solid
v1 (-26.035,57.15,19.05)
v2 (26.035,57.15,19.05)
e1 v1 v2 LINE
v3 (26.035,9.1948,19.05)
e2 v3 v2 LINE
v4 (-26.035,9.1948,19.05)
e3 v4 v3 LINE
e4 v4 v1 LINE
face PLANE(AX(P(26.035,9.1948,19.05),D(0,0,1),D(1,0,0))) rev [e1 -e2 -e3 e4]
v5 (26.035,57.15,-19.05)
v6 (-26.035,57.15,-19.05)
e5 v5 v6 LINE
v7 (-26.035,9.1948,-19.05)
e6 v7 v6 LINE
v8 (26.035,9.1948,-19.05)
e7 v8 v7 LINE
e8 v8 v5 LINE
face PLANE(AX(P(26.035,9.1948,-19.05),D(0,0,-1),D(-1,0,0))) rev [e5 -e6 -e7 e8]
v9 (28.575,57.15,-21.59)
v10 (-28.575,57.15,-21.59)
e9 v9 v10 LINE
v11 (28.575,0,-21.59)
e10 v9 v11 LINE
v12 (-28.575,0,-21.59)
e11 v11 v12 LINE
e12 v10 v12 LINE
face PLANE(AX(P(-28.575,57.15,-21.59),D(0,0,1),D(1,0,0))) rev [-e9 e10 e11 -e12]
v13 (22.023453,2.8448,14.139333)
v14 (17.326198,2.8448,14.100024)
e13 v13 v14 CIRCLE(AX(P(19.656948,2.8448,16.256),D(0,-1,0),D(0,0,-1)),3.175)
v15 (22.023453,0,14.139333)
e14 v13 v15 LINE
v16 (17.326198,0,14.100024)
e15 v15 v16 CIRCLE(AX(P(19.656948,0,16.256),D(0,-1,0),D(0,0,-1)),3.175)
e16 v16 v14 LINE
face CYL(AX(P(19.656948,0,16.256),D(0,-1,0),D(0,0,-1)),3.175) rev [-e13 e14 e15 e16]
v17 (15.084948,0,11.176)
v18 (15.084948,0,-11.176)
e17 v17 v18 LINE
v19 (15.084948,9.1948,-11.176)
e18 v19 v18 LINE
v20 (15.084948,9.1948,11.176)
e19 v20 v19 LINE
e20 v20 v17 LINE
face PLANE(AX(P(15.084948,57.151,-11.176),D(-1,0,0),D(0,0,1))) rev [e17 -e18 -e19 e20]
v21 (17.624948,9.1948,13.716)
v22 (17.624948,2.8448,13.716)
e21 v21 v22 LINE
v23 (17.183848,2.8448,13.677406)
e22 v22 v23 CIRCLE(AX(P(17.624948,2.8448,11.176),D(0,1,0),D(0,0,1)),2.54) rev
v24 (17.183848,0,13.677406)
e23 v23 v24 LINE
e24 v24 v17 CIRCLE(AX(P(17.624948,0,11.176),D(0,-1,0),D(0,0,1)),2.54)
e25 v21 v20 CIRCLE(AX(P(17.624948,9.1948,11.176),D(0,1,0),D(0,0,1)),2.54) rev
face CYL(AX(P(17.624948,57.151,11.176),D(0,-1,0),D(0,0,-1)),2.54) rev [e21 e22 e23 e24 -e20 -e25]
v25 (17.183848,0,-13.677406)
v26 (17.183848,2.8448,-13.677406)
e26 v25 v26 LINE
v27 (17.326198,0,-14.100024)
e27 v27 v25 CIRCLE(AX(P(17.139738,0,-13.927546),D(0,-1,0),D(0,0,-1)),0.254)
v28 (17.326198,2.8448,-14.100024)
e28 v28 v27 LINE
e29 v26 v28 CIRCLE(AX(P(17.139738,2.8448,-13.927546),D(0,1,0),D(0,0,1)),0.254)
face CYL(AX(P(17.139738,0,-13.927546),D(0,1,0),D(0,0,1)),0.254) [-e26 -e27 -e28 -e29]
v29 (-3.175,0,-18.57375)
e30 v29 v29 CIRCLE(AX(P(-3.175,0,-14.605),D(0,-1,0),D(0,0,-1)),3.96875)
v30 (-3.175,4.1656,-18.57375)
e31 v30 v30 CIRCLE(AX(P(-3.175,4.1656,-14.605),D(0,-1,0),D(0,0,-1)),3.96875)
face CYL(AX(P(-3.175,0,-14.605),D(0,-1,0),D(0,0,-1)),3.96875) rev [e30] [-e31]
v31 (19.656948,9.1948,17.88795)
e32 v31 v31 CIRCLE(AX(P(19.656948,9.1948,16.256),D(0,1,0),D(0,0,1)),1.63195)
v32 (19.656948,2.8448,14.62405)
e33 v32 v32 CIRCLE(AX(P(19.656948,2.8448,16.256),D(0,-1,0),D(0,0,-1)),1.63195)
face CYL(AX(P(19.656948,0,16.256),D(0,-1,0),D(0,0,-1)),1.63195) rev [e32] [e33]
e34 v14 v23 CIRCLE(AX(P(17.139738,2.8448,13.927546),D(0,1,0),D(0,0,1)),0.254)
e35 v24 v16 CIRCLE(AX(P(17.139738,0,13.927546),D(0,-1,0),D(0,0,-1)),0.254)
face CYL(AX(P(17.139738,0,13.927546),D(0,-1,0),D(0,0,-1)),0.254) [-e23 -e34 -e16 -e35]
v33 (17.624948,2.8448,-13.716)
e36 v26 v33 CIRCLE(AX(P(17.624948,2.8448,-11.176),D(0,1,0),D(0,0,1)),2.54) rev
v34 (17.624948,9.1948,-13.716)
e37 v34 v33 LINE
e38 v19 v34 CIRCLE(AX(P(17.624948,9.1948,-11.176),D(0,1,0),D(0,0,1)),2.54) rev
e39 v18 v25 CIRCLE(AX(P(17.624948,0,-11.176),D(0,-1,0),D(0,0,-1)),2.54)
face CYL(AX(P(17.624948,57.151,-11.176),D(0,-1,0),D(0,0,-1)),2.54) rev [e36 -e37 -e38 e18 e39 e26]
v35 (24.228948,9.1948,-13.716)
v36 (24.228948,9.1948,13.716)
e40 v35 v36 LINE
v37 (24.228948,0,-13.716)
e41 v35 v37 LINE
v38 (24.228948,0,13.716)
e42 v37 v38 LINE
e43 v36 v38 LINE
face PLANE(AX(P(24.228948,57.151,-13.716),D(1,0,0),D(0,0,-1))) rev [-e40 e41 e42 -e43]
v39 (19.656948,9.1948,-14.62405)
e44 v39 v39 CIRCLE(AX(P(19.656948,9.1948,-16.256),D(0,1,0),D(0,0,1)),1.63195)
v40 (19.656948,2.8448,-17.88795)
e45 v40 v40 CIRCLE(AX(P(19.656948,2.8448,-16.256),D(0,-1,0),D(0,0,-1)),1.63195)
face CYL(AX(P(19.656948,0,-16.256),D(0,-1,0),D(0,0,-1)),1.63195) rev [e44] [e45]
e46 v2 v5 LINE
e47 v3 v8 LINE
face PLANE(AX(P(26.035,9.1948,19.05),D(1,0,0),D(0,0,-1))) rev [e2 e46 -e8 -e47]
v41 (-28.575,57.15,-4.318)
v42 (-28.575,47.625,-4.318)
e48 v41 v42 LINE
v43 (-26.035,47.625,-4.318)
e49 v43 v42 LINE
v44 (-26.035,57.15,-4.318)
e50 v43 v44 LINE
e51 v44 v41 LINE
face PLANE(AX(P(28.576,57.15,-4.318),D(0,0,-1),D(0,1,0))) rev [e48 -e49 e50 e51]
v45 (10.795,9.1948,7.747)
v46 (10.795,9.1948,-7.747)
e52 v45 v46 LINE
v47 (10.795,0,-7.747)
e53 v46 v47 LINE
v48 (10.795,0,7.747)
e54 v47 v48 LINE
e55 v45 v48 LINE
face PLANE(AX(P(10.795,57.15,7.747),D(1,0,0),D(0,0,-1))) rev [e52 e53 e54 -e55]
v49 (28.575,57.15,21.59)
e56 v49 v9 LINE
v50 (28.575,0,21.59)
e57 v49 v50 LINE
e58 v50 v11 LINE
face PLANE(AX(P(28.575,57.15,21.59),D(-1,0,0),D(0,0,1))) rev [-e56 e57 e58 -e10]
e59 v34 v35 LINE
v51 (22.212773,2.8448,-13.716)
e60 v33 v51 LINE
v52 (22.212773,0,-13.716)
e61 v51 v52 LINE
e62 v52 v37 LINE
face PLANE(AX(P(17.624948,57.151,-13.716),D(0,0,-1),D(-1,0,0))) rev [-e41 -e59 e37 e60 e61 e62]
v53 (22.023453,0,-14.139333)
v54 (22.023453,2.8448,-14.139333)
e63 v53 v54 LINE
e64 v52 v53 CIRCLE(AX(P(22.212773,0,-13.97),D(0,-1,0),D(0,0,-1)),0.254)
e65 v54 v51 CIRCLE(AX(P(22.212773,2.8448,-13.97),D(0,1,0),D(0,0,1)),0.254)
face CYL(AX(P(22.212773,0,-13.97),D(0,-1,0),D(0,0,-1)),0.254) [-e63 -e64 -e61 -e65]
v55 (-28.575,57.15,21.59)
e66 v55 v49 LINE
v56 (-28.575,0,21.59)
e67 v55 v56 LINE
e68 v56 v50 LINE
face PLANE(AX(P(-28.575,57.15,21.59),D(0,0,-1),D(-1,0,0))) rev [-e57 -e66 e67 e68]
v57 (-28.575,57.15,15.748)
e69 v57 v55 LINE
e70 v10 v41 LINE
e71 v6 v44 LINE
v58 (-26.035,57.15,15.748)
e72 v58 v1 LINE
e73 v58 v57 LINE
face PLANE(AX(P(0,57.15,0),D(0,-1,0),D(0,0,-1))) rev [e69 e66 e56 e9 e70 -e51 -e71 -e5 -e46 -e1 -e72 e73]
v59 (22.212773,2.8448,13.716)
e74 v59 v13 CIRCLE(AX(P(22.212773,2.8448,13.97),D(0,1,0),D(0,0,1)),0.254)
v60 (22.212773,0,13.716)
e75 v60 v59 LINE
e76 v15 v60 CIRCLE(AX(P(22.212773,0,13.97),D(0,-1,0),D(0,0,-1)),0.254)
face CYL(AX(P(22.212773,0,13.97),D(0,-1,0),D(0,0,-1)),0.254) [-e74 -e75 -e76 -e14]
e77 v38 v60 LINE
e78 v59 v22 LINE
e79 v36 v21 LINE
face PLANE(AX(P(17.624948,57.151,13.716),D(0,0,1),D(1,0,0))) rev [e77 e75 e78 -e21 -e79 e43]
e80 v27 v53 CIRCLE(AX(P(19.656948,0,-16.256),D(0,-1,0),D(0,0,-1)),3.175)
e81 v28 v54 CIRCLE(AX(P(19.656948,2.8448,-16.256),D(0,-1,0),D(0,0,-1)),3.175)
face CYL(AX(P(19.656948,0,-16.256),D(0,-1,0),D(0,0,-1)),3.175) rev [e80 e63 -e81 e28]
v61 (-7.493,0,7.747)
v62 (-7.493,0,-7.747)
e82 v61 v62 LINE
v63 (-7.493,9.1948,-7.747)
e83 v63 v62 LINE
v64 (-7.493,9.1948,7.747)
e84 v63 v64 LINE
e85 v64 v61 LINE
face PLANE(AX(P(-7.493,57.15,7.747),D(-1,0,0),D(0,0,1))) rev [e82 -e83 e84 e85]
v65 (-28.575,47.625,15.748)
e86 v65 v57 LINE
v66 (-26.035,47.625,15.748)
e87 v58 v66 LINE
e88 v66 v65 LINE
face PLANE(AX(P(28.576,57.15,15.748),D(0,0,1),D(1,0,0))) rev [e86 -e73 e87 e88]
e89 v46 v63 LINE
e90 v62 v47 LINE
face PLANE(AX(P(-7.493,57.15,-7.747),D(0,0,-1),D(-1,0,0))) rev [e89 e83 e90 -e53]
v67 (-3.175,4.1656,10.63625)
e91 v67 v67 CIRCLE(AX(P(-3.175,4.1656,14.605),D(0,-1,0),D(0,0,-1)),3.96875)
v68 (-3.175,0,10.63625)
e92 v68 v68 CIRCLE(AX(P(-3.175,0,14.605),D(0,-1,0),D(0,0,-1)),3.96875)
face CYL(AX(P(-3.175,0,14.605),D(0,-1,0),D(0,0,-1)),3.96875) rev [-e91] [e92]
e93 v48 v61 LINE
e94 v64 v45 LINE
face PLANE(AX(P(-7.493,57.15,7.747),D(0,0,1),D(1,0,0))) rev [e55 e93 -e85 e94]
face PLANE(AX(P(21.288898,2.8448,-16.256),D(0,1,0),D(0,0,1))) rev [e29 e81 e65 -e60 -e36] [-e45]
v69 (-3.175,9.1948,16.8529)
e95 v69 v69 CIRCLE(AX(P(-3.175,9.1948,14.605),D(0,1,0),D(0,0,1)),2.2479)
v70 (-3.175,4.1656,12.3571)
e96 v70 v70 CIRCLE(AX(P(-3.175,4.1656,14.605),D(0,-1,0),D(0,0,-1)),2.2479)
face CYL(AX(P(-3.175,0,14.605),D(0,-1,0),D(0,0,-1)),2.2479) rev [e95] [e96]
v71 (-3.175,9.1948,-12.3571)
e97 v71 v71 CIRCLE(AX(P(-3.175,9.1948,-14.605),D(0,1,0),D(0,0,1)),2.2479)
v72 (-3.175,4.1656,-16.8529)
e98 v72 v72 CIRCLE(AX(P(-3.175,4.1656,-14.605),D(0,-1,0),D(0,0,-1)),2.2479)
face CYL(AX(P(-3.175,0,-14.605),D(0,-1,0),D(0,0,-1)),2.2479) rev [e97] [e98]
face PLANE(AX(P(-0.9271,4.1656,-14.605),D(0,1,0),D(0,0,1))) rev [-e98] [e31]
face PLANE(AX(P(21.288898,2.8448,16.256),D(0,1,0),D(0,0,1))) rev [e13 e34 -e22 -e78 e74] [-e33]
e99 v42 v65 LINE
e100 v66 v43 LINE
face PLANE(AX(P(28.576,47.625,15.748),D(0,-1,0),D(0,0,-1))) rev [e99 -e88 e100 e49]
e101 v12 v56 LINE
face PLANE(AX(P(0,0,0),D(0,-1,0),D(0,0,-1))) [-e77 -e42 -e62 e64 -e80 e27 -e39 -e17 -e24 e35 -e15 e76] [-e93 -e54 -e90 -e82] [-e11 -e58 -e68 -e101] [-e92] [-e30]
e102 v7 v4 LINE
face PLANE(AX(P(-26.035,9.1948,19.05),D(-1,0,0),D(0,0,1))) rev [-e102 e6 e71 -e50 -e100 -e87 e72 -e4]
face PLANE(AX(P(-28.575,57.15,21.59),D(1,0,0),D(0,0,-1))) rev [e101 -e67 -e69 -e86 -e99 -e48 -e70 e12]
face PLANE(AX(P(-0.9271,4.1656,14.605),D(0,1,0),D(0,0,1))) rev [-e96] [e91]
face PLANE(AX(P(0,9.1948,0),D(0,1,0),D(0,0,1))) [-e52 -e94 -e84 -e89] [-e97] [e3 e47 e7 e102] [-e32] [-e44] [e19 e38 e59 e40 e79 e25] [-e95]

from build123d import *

# Parameters (mm, degrees)
SKETCH1_W                                      = 57.14999999999999
SKETCH1_H                                      = 43.17999999999999
BASE_DEPTH                                     = 57.15
POCKET_DEPTH                                   = 47.9552
LINACTHOLE_DEPTH                               = 68.44465304974146
ROLLMOTORHOLE_REACH                            = 85.656
DVIHOLE_REACH                                  = 69.445
CBORE_FOR_4_SOCKET_HEAD_CAP_SCREW1_D           = 3.2639
CBORE_FOR_4_SOCKET_HEAD_CAP_SCREW1_CBORE_D     = 6.35
CBORE_FOR_4_SOCKET_HEAD_CAP_SCREW1_CBORE_DEPTH = 2.8448
CBORE_FOR_8_SOCKET_HEAD_CAP_SCREW1_D           = 4.4958
CBORE_FOR_8_SOCKET_HEAD_CAP_SCREW1_CBORE_D     = 7.9375
CBORE_FOR_8_SOCKET_HEAD_CAP_SCREW1_CBORE_DEPTH = 4.1656
FILLET1_R                                      = 0.254


with BuildPart() as part:
    # Sketch1 → Base (new body)
    with BuildSketch(Plane(origin=(0, 0, 0), x_dir=(1, 0, 0), z_dir=(0, 1, 0))):
        Rectangle(SKETCH1_W, SKETCH1_H)
    extrude(amount=BASE_DEPTH)

    # Sketch2 → Pocket (cut)
    with BuildSketch(Plane(origin=(0, 57.15, 0), x_dir=(1, 0, 0), z_dir=(0, 1, 0))):
        Polygon((26.035000000000004, -19.05), (-26.03499999999999, -19.050000000000008), (-26.03499999999999, 19.049999999999994), (26.035000000000004, 19.050000000000004), align=None)
    extrude(amount=-POCKET_DEPTH, mode=Mode.SUBTRACT)

    # Sketch3 → LinActHole (cut, through all)
    with BuildSketch(Plane(origin=(0, 0, 0), x_dir=(-1, 0, 0), z_dir=(0, -1, 0))):
        Polygon((7.492999999999988, -7.7470000000000026), (-10.79500000000001, -7.747000000000003), (-10.79500000000001, 7.746999999999995), (7.492999999999988, 7.746999999999996), align=None)
    extrude(amount=-LINACTHOLE_DEPTH, mode=Mode.SUBTRACT)

    # Sketch4 → RollMotorHole (cut, up to next)
    with BuildSketch(Plane.ZY.offset(28.575), mode=Mode.PRIVATE) as rollmotorhole_sk1:
        Polygon((15.747999999999998, 57.15), (-4.317999999999999, 57.150000000000006), (-4.317999999999998, 47.625), (15.747999999999998, 47.625000000000014), align=None)
    rollmotorhole_tool1 = extrude(rollmotorhole_sk1.sketch, amount=-ROLLMOTORHOLE_REACH, mode=Mode.PRIVATE) & part.part
    add(rollmotorhole_tool1.solids().sort_by_distance((-28.575, 52.3875, 5.715))[0], mode=Mode.SUBTRACT)

    # Sketch5 → DviHole (cut, up to next)
    with BuildSketch(Plane.XZ, mode=Mode.PRIVATE) as dvihole_sk1:
        with BuildLine():
            Line((17.624947542752004, -13.715999999999998), (24.228947542752003, -13.716))
            Line((24.228947542752003, -13.716), (24.228947542752003, 13.716000000000003))
            Line((24.228947542752003, 13.716000000000003), (17.624947542752004, 13.716000000000005))
            ThreePointArc((17.624947542752004, 13.716000000000005), (15.828896318538174, 12.972051224213832), (15.084947542752005, 11.176000000000002))
            Line((15.084947542752005, 11.176000000000002), (15.084947542752005, -11.175999999999998))
            ThreePointArc((15.084947542752005, -11.175999999999998), (15.828896318538174, -12.972051224213828), (17.624947542752004, -13.715999999999998))
        make_face()
    dvihole_tool1 = extrude(dvihole_sk1.sketch, amount=-DVIHOLE_REACH, mode=Mode.PRIVATE) & part.part
    add(dvihole_tool1.solids().sort_by_distance((19.701649, 0, 0))[0], mode=Mode.SUBTRACT)

    # CBORE for #4 Socket Head Cap Screw1 (through all)
    with Locations(Plane(origin=(0, 0, 0), x_dir=(-1, 0, 0), z_dir=(0, -1, 0))):
        with Locations((-19.656947543, 16.256), (-19.656947543, -16.256)):
            CounterBoreHole(CBORE_FOR_4_SOCKET_HEAD_CAP_SCREW1_D / 2, CBORE_FOR_4_SOCKET_HEAD_CAP_SCREW1_CBORE_D / 2, CBORE_FOR_4_SOCKET_HEAD_CAP_SCREW1_CBORE_DEPTH)

    # CBORE for #8 Socket Head Cap Screw1 (through all)
    with Locations(Plane(origin=(0, 0, 0), x_dir=(-1, 0, 0), z_dir=(0, -1, 0))):
        with Locations((3.175, 14.605), (3.175, -14.605)):
            CounterBoreHole(CBORE_FOR_8_SOCKET_HEAD_CAP_SCREW1_D / 2, CBORE_FOR_8_SOCKET_HEAD_CAP_SCREW1_CBORE_D / 2, CBORE_FOR_8_SOCKET_HEAD_CAP_SCREW1_CBORE_DEPTH)

    # Fillet1
    # the kernel refuses this fillet: 0.254 mm, written as the material it takes off along each edge
    with BuildSketch(Plane(origin=(21.56194754300001, 2.8448, 13.716000000000006), x_dir=(1, 0, -5.46e-15), z_dir=(0, -1, 0))) as fillet1_piece_1:
        with BuildLine():
            CenterArc((0.6508256982823206, 0.25399999999999956), FILLET1_R, 138.18968510422349, 131.8103148957768)
            ThreePointArc((0.4615052761873327, 0.4233333333333256), (0.24121576475939824, 0.20026008045803986), (0, 0))
            Line((0, 0), (0.650825698282322, 0))
        make_face()
    extrude(amount=4.471864245705805, mode=Mode.SUBTRACT)
    with BuildSketch(Plane(origin=(17.751947542999993, 2.8448, 13.716000000000006), x_dir=(-0.9977003347705025, 0, -0.06777936263220105), z_dir=(0, -1, 0))) as fillet1_piece_2:
        with BuildLine():
            CenterArc((0.5964633639844708, -0.2525550871245977), FILLET1_R, 96.11431340709308, 122.7684855876463)
            Line((0.3987417282209075, -0.4119983521155698), (0.37896956464454973, -0.4279426786146676))
            ThreePointArc((0.37896956464454973, -0.4279426786146676), (0.19043822259418336, -0.21464439732501625), (-0.01658222975058737, -0.01924031331602186))
            Line((-0.01658222975058737, -0.01924031331602186), (0.00172159581085787, 0.02534158850317019))
            ThreePointArc((0.00172159581085787, 0.02534158850317019), (0.12842953857413036, 0.01673360943207212), (0.5667037799709318, 0.02525550871246005))
            Line((0.5667037799709318, 0.02525550871246005), (0.5694091966994345, 0))
        make_face()
    extrude(amount=4.278191101484826, mode=Mode.SUBTRACT)
    with BuildSketch(Plane(origin=(17.751947543000007, 2.8448, -13.715999999999996), x_dir=(-0.9977003347705027, 0, 0.06777936263219668), z_dir=(0, -1, 0))) as fillet1_piece_3:
        with BuildLine():
            CenterArc((0.5964633639844823, 0.25255508712459757), FILLET1_R, 141.1172010052604, 122.76848558764627)
            Line((0.3987417282209198, 0.4119983521155705), (0.37896956464456205, 0.4279426786146684))
            ThreePointArc((0.37896956464456205, 0.4279426786146684), (0.19043822259419124, 0.21464439732501767), (-0.01658222975058728, 0.01924031331602193))
            Line((-0.01658222975058728, 0.01924031331602193), (0.00172159581085776, -0.02534158850317019))
            ThreePointArc((0.00172159581085776, -0.02534158850317019), (0.12842953857414433, -0.01673360943206995), (0.5667037799709422, -0.02525550871246003))
            Line((0.5667037799709422, -0.02525550871246003), (0.5694091966994449, 0))
        make_face()
    extrude(amount=4.278191101484849, mode=Mode.SUBTRACT)
    with BuildSketch(Plane(origin=(21.561947542999995, 2.8448, -13.715999999999996), x_dir=(1, 0, -5.46e-15), z_dir=(0, -1, 0))) as fillet1_piece_4:
        with BuildLine():
            CenterArc((0.6508256982823268, -0.25399999999999956), FILLET1_R, 90.0000000000003, 131.81031489577913)
            ThreePointArc((0.46150527618734805, -0.42333333333333484), (0.2412157647594075, -0.20026008045804258), (0, 0))
            Line((0, 0), (0.6508256982823255, 0))
        make_face()
    extrude(amount=4.471864245705815, mode=Mode.SUBTRACT)


solid = part.part
